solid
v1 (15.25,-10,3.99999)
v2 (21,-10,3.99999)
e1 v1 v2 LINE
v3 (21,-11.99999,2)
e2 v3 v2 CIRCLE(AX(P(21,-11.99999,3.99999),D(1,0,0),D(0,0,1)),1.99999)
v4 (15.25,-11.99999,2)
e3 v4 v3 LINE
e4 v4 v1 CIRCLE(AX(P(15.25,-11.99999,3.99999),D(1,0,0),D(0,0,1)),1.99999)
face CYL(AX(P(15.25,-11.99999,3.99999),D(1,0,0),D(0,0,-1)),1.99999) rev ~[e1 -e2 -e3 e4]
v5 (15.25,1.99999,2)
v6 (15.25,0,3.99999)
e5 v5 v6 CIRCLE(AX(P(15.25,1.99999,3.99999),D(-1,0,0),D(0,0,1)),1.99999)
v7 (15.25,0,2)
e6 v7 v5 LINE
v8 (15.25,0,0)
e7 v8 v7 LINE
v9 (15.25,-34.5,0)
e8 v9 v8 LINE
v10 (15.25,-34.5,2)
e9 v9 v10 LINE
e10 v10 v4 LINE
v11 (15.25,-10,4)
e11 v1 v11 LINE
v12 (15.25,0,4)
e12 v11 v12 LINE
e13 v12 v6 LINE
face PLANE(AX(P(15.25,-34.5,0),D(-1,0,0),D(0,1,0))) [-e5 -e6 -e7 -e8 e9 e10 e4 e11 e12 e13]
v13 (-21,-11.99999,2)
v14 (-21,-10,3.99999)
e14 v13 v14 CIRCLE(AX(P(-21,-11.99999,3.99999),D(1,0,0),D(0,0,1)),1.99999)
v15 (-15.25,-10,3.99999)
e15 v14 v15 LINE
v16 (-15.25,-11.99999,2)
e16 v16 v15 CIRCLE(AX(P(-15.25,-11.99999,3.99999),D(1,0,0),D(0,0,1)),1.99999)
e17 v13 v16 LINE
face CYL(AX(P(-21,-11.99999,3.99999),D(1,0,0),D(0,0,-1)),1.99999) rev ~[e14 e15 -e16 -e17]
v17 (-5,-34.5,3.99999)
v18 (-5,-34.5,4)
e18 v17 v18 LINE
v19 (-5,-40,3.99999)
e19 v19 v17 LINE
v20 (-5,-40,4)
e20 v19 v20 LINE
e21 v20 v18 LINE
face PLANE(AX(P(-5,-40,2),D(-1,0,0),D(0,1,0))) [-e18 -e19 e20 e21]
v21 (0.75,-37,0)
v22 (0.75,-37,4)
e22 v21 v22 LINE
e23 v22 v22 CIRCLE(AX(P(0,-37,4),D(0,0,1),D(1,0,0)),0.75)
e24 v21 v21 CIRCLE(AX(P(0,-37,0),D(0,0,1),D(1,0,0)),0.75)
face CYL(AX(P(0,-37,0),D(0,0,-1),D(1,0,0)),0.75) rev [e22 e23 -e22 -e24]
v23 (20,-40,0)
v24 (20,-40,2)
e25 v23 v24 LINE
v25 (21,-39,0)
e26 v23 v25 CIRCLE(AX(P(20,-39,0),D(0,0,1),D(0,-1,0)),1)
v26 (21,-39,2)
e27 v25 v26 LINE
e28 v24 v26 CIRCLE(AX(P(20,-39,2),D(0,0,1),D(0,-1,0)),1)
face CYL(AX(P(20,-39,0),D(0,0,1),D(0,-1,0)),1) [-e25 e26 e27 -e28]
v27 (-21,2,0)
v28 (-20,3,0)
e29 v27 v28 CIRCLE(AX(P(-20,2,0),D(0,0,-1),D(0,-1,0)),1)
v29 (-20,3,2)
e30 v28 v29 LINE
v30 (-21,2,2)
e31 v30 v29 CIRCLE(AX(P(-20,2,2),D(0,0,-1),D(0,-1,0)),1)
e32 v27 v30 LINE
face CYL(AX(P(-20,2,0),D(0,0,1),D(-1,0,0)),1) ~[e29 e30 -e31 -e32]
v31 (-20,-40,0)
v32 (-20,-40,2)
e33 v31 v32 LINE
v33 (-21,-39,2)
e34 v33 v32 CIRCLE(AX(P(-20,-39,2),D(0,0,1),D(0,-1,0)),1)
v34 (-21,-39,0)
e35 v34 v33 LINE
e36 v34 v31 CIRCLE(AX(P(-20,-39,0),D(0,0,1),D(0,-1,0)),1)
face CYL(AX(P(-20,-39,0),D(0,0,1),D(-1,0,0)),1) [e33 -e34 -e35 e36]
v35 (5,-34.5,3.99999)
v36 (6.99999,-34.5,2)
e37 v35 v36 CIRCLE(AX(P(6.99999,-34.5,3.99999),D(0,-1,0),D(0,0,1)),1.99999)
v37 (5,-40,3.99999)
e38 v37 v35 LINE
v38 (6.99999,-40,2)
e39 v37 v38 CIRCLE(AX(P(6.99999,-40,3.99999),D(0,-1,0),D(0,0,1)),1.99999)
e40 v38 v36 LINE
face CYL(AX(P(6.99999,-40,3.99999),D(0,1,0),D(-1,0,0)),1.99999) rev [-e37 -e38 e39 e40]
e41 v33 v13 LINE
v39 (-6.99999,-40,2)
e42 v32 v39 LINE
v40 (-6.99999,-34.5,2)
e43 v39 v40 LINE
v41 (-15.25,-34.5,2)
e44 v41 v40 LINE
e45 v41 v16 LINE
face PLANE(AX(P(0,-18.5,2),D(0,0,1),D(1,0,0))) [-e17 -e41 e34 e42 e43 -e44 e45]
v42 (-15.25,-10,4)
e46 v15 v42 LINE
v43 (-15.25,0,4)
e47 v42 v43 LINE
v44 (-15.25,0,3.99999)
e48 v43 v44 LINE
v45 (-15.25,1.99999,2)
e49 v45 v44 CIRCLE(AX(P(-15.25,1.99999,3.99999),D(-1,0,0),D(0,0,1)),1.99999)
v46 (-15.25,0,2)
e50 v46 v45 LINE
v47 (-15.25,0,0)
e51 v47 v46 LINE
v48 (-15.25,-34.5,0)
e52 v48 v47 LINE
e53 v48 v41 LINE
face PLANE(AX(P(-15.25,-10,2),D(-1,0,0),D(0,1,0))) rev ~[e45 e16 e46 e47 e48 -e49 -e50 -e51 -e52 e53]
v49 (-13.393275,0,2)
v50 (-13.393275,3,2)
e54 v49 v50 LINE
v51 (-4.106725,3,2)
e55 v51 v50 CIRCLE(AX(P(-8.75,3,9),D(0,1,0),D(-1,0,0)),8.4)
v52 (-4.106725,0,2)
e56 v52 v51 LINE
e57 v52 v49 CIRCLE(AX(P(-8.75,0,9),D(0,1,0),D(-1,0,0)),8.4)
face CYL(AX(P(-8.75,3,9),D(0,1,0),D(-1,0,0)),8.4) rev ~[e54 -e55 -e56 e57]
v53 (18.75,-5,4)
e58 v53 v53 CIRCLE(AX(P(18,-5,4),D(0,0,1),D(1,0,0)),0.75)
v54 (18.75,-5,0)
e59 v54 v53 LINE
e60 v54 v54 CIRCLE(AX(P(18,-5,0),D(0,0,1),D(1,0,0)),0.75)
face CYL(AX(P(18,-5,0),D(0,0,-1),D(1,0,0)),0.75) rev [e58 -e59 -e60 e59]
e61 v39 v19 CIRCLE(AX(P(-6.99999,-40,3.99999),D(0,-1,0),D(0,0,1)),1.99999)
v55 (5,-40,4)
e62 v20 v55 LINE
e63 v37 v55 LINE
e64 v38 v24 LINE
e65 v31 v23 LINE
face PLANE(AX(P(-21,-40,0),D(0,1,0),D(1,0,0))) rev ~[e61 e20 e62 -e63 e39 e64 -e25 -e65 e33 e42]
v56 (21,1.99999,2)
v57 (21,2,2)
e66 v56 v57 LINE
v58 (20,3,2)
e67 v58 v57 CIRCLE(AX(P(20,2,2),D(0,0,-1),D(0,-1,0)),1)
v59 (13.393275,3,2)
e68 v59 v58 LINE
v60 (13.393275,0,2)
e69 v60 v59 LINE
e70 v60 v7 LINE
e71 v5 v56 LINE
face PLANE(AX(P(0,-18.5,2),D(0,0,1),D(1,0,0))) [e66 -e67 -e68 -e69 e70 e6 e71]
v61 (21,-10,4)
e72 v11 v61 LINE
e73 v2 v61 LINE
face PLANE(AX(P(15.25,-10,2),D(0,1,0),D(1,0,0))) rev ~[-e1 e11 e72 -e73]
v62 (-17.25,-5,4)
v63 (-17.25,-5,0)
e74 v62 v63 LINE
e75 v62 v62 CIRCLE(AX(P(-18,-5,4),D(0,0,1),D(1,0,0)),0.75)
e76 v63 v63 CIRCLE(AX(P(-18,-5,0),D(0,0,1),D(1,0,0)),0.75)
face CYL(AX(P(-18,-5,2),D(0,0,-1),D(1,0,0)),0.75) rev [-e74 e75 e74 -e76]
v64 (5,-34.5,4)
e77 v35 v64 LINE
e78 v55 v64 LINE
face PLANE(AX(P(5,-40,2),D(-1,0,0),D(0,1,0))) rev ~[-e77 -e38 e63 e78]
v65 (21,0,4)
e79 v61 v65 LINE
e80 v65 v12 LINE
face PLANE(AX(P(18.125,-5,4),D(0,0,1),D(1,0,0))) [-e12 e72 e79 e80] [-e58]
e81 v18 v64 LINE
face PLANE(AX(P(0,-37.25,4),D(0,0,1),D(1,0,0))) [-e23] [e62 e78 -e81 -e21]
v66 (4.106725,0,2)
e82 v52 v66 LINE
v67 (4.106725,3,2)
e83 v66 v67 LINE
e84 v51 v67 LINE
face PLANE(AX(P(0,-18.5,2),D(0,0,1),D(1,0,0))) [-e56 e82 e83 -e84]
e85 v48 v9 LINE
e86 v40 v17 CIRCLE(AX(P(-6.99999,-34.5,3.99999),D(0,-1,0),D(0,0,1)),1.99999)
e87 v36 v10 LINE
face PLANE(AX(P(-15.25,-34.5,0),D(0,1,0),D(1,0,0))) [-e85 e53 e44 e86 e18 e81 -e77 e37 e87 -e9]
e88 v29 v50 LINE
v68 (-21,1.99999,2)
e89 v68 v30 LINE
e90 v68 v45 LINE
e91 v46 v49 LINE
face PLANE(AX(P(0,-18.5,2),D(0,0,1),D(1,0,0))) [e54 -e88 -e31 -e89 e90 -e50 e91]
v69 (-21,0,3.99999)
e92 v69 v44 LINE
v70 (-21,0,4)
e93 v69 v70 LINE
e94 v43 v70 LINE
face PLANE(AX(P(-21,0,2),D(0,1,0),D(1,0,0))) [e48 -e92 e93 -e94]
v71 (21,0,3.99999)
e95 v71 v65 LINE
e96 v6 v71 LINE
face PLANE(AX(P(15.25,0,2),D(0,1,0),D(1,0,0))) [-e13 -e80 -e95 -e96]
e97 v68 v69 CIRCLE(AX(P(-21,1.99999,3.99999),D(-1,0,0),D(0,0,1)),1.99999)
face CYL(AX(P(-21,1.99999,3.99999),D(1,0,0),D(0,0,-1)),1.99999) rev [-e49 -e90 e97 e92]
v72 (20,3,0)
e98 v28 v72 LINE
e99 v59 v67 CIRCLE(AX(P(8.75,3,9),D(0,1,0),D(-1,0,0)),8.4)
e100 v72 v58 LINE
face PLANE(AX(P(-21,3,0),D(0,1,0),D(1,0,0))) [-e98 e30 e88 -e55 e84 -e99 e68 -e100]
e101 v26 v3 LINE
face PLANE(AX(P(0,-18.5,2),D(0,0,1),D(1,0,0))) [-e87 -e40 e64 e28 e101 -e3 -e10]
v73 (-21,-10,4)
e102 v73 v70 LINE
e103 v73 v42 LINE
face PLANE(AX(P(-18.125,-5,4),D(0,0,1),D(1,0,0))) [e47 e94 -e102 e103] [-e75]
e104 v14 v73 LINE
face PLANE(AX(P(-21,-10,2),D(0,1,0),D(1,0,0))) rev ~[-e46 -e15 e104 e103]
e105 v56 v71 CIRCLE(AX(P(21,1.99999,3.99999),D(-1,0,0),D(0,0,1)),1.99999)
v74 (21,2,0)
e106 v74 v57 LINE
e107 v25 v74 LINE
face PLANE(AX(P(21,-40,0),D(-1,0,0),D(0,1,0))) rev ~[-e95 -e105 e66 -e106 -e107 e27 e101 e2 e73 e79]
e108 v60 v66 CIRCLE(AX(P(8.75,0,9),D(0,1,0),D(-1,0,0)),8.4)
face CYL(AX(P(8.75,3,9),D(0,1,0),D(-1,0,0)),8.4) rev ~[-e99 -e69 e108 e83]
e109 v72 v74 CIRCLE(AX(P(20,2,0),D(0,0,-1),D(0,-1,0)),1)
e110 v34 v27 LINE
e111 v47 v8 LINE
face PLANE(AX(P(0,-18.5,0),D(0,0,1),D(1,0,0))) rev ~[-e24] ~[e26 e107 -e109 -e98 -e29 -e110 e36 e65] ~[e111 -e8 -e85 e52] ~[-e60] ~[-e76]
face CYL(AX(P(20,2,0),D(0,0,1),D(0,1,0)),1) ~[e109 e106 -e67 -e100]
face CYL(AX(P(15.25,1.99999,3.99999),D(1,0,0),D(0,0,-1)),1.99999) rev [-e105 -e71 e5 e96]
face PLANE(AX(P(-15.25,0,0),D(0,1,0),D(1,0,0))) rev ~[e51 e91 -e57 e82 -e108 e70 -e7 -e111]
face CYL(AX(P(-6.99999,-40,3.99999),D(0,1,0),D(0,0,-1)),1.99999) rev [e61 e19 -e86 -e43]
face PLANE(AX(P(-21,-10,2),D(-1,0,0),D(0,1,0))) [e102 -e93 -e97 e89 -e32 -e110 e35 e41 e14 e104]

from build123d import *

# Parameters (mm, degrees)
F0_W     = 42
F0_H     = 43
F0_R     = 0.75
F0_W_2   = 30.5
F0_H_2   = 34.5
F1_DEPTH = 2
F2_W     = 5.75
F2_H     = 10
F2_R     = 0.75
F2_W_2   = 10
F2_H_2   = 5.5
F3_DEPTH = 2
F4_R     = 8.4
F5_DEPTH = 3
F6_R     = 1.99999
F7_R     = 1


# Not quite as in the source:
# - a fillet or chamfer is up to 0.001 mm smaller than in the source, because OpenCascade refuses the exact size


with BuildPart() as f1:
    # F0 (on Top) → F1 (new body)
    with BuildSketch(Plane.XY):
        with Locations((0, -18.5)):
            Rectangle(F0_W, F0_H)
        with Locations((0, -37)):
            Circle(F0_R, mode=Mode.SUBTRACT)
        with Locations((-18, -5)):
            Circle(F0_R, mode=Mode.SUBTRACT)
        with Locations((0, -17.25)):
            Rectangle(F0_W_2, F0_H_2, mode=Mode.SUBTRACT)
        with Locations((18, -5)):
            Circle(F0_R, mode=Mode.SUBTRACT)
    extrude(amount=F1_DEPTH)

    # F2 (on face) → F3 (join)
    with BuildSketch(Plane.XY.offset(2)):
        with Locations((-18.125, -5)):
            Rectangle(F2_W, F2_H)
        with Locations((-18, -5)):
            Circle(F2_R, mode=Mode.SUBTRACT)
        with Locations((18.125, -5)):
            Rectangle(F2_W, F2_H)
        with Locations((18, -5)):
            Circle(F2_R, mode=Mode.SUBTRACT)
        with Locations((0, -37.25)):
            Rectangle(F2_W_2, F2_H_2)
        with Locations((0, -37)):
            Circle(F2_R, mode=Mode.SUBTRACT)
    extrude(amount=F3_DEPTH)

    # F4 (on face) → F5 (cut, through all)
    with BuildSketch(Plane(origin=(0, 3, 0), x_dir=(-1, 0, 0), z_dir=(0, 1, 0))):
        with Locations((-8.75, 9)):
            Circle(F4_R)
        with Locations((8.75, 9)):
            Circle(F4_R)
    extrude(amount=-F5_DEPTH, mode=Mode.SUBTRACT)

    # F6 (radius 2 in the source; OpenCascade refuses exactly that, so slightly less here)
    f6_edges = [f1.edges().sort_by_distance(p)[0] for p in [
        (5, -37.25, 2),
        (18.125, -10, 2),
        (-18.125, -10, 2),
        (-5, -37.25, 2),
        (18.125, 0, 2),
        (-18.125, 0, 2),
    ]]
    fillet(f6_edges, radius=F6_R)

    # F7
    f7_edges = [f1.edges().sort_by_distance(p)[0] for p in [
        (-21, -40, 1),
        (-21, 3, 1),
        (21, -40, 1),
        (21, 3, 1),
    ]]
    fillet(f7_edges, radius=F7_R)


solid = f1.part
